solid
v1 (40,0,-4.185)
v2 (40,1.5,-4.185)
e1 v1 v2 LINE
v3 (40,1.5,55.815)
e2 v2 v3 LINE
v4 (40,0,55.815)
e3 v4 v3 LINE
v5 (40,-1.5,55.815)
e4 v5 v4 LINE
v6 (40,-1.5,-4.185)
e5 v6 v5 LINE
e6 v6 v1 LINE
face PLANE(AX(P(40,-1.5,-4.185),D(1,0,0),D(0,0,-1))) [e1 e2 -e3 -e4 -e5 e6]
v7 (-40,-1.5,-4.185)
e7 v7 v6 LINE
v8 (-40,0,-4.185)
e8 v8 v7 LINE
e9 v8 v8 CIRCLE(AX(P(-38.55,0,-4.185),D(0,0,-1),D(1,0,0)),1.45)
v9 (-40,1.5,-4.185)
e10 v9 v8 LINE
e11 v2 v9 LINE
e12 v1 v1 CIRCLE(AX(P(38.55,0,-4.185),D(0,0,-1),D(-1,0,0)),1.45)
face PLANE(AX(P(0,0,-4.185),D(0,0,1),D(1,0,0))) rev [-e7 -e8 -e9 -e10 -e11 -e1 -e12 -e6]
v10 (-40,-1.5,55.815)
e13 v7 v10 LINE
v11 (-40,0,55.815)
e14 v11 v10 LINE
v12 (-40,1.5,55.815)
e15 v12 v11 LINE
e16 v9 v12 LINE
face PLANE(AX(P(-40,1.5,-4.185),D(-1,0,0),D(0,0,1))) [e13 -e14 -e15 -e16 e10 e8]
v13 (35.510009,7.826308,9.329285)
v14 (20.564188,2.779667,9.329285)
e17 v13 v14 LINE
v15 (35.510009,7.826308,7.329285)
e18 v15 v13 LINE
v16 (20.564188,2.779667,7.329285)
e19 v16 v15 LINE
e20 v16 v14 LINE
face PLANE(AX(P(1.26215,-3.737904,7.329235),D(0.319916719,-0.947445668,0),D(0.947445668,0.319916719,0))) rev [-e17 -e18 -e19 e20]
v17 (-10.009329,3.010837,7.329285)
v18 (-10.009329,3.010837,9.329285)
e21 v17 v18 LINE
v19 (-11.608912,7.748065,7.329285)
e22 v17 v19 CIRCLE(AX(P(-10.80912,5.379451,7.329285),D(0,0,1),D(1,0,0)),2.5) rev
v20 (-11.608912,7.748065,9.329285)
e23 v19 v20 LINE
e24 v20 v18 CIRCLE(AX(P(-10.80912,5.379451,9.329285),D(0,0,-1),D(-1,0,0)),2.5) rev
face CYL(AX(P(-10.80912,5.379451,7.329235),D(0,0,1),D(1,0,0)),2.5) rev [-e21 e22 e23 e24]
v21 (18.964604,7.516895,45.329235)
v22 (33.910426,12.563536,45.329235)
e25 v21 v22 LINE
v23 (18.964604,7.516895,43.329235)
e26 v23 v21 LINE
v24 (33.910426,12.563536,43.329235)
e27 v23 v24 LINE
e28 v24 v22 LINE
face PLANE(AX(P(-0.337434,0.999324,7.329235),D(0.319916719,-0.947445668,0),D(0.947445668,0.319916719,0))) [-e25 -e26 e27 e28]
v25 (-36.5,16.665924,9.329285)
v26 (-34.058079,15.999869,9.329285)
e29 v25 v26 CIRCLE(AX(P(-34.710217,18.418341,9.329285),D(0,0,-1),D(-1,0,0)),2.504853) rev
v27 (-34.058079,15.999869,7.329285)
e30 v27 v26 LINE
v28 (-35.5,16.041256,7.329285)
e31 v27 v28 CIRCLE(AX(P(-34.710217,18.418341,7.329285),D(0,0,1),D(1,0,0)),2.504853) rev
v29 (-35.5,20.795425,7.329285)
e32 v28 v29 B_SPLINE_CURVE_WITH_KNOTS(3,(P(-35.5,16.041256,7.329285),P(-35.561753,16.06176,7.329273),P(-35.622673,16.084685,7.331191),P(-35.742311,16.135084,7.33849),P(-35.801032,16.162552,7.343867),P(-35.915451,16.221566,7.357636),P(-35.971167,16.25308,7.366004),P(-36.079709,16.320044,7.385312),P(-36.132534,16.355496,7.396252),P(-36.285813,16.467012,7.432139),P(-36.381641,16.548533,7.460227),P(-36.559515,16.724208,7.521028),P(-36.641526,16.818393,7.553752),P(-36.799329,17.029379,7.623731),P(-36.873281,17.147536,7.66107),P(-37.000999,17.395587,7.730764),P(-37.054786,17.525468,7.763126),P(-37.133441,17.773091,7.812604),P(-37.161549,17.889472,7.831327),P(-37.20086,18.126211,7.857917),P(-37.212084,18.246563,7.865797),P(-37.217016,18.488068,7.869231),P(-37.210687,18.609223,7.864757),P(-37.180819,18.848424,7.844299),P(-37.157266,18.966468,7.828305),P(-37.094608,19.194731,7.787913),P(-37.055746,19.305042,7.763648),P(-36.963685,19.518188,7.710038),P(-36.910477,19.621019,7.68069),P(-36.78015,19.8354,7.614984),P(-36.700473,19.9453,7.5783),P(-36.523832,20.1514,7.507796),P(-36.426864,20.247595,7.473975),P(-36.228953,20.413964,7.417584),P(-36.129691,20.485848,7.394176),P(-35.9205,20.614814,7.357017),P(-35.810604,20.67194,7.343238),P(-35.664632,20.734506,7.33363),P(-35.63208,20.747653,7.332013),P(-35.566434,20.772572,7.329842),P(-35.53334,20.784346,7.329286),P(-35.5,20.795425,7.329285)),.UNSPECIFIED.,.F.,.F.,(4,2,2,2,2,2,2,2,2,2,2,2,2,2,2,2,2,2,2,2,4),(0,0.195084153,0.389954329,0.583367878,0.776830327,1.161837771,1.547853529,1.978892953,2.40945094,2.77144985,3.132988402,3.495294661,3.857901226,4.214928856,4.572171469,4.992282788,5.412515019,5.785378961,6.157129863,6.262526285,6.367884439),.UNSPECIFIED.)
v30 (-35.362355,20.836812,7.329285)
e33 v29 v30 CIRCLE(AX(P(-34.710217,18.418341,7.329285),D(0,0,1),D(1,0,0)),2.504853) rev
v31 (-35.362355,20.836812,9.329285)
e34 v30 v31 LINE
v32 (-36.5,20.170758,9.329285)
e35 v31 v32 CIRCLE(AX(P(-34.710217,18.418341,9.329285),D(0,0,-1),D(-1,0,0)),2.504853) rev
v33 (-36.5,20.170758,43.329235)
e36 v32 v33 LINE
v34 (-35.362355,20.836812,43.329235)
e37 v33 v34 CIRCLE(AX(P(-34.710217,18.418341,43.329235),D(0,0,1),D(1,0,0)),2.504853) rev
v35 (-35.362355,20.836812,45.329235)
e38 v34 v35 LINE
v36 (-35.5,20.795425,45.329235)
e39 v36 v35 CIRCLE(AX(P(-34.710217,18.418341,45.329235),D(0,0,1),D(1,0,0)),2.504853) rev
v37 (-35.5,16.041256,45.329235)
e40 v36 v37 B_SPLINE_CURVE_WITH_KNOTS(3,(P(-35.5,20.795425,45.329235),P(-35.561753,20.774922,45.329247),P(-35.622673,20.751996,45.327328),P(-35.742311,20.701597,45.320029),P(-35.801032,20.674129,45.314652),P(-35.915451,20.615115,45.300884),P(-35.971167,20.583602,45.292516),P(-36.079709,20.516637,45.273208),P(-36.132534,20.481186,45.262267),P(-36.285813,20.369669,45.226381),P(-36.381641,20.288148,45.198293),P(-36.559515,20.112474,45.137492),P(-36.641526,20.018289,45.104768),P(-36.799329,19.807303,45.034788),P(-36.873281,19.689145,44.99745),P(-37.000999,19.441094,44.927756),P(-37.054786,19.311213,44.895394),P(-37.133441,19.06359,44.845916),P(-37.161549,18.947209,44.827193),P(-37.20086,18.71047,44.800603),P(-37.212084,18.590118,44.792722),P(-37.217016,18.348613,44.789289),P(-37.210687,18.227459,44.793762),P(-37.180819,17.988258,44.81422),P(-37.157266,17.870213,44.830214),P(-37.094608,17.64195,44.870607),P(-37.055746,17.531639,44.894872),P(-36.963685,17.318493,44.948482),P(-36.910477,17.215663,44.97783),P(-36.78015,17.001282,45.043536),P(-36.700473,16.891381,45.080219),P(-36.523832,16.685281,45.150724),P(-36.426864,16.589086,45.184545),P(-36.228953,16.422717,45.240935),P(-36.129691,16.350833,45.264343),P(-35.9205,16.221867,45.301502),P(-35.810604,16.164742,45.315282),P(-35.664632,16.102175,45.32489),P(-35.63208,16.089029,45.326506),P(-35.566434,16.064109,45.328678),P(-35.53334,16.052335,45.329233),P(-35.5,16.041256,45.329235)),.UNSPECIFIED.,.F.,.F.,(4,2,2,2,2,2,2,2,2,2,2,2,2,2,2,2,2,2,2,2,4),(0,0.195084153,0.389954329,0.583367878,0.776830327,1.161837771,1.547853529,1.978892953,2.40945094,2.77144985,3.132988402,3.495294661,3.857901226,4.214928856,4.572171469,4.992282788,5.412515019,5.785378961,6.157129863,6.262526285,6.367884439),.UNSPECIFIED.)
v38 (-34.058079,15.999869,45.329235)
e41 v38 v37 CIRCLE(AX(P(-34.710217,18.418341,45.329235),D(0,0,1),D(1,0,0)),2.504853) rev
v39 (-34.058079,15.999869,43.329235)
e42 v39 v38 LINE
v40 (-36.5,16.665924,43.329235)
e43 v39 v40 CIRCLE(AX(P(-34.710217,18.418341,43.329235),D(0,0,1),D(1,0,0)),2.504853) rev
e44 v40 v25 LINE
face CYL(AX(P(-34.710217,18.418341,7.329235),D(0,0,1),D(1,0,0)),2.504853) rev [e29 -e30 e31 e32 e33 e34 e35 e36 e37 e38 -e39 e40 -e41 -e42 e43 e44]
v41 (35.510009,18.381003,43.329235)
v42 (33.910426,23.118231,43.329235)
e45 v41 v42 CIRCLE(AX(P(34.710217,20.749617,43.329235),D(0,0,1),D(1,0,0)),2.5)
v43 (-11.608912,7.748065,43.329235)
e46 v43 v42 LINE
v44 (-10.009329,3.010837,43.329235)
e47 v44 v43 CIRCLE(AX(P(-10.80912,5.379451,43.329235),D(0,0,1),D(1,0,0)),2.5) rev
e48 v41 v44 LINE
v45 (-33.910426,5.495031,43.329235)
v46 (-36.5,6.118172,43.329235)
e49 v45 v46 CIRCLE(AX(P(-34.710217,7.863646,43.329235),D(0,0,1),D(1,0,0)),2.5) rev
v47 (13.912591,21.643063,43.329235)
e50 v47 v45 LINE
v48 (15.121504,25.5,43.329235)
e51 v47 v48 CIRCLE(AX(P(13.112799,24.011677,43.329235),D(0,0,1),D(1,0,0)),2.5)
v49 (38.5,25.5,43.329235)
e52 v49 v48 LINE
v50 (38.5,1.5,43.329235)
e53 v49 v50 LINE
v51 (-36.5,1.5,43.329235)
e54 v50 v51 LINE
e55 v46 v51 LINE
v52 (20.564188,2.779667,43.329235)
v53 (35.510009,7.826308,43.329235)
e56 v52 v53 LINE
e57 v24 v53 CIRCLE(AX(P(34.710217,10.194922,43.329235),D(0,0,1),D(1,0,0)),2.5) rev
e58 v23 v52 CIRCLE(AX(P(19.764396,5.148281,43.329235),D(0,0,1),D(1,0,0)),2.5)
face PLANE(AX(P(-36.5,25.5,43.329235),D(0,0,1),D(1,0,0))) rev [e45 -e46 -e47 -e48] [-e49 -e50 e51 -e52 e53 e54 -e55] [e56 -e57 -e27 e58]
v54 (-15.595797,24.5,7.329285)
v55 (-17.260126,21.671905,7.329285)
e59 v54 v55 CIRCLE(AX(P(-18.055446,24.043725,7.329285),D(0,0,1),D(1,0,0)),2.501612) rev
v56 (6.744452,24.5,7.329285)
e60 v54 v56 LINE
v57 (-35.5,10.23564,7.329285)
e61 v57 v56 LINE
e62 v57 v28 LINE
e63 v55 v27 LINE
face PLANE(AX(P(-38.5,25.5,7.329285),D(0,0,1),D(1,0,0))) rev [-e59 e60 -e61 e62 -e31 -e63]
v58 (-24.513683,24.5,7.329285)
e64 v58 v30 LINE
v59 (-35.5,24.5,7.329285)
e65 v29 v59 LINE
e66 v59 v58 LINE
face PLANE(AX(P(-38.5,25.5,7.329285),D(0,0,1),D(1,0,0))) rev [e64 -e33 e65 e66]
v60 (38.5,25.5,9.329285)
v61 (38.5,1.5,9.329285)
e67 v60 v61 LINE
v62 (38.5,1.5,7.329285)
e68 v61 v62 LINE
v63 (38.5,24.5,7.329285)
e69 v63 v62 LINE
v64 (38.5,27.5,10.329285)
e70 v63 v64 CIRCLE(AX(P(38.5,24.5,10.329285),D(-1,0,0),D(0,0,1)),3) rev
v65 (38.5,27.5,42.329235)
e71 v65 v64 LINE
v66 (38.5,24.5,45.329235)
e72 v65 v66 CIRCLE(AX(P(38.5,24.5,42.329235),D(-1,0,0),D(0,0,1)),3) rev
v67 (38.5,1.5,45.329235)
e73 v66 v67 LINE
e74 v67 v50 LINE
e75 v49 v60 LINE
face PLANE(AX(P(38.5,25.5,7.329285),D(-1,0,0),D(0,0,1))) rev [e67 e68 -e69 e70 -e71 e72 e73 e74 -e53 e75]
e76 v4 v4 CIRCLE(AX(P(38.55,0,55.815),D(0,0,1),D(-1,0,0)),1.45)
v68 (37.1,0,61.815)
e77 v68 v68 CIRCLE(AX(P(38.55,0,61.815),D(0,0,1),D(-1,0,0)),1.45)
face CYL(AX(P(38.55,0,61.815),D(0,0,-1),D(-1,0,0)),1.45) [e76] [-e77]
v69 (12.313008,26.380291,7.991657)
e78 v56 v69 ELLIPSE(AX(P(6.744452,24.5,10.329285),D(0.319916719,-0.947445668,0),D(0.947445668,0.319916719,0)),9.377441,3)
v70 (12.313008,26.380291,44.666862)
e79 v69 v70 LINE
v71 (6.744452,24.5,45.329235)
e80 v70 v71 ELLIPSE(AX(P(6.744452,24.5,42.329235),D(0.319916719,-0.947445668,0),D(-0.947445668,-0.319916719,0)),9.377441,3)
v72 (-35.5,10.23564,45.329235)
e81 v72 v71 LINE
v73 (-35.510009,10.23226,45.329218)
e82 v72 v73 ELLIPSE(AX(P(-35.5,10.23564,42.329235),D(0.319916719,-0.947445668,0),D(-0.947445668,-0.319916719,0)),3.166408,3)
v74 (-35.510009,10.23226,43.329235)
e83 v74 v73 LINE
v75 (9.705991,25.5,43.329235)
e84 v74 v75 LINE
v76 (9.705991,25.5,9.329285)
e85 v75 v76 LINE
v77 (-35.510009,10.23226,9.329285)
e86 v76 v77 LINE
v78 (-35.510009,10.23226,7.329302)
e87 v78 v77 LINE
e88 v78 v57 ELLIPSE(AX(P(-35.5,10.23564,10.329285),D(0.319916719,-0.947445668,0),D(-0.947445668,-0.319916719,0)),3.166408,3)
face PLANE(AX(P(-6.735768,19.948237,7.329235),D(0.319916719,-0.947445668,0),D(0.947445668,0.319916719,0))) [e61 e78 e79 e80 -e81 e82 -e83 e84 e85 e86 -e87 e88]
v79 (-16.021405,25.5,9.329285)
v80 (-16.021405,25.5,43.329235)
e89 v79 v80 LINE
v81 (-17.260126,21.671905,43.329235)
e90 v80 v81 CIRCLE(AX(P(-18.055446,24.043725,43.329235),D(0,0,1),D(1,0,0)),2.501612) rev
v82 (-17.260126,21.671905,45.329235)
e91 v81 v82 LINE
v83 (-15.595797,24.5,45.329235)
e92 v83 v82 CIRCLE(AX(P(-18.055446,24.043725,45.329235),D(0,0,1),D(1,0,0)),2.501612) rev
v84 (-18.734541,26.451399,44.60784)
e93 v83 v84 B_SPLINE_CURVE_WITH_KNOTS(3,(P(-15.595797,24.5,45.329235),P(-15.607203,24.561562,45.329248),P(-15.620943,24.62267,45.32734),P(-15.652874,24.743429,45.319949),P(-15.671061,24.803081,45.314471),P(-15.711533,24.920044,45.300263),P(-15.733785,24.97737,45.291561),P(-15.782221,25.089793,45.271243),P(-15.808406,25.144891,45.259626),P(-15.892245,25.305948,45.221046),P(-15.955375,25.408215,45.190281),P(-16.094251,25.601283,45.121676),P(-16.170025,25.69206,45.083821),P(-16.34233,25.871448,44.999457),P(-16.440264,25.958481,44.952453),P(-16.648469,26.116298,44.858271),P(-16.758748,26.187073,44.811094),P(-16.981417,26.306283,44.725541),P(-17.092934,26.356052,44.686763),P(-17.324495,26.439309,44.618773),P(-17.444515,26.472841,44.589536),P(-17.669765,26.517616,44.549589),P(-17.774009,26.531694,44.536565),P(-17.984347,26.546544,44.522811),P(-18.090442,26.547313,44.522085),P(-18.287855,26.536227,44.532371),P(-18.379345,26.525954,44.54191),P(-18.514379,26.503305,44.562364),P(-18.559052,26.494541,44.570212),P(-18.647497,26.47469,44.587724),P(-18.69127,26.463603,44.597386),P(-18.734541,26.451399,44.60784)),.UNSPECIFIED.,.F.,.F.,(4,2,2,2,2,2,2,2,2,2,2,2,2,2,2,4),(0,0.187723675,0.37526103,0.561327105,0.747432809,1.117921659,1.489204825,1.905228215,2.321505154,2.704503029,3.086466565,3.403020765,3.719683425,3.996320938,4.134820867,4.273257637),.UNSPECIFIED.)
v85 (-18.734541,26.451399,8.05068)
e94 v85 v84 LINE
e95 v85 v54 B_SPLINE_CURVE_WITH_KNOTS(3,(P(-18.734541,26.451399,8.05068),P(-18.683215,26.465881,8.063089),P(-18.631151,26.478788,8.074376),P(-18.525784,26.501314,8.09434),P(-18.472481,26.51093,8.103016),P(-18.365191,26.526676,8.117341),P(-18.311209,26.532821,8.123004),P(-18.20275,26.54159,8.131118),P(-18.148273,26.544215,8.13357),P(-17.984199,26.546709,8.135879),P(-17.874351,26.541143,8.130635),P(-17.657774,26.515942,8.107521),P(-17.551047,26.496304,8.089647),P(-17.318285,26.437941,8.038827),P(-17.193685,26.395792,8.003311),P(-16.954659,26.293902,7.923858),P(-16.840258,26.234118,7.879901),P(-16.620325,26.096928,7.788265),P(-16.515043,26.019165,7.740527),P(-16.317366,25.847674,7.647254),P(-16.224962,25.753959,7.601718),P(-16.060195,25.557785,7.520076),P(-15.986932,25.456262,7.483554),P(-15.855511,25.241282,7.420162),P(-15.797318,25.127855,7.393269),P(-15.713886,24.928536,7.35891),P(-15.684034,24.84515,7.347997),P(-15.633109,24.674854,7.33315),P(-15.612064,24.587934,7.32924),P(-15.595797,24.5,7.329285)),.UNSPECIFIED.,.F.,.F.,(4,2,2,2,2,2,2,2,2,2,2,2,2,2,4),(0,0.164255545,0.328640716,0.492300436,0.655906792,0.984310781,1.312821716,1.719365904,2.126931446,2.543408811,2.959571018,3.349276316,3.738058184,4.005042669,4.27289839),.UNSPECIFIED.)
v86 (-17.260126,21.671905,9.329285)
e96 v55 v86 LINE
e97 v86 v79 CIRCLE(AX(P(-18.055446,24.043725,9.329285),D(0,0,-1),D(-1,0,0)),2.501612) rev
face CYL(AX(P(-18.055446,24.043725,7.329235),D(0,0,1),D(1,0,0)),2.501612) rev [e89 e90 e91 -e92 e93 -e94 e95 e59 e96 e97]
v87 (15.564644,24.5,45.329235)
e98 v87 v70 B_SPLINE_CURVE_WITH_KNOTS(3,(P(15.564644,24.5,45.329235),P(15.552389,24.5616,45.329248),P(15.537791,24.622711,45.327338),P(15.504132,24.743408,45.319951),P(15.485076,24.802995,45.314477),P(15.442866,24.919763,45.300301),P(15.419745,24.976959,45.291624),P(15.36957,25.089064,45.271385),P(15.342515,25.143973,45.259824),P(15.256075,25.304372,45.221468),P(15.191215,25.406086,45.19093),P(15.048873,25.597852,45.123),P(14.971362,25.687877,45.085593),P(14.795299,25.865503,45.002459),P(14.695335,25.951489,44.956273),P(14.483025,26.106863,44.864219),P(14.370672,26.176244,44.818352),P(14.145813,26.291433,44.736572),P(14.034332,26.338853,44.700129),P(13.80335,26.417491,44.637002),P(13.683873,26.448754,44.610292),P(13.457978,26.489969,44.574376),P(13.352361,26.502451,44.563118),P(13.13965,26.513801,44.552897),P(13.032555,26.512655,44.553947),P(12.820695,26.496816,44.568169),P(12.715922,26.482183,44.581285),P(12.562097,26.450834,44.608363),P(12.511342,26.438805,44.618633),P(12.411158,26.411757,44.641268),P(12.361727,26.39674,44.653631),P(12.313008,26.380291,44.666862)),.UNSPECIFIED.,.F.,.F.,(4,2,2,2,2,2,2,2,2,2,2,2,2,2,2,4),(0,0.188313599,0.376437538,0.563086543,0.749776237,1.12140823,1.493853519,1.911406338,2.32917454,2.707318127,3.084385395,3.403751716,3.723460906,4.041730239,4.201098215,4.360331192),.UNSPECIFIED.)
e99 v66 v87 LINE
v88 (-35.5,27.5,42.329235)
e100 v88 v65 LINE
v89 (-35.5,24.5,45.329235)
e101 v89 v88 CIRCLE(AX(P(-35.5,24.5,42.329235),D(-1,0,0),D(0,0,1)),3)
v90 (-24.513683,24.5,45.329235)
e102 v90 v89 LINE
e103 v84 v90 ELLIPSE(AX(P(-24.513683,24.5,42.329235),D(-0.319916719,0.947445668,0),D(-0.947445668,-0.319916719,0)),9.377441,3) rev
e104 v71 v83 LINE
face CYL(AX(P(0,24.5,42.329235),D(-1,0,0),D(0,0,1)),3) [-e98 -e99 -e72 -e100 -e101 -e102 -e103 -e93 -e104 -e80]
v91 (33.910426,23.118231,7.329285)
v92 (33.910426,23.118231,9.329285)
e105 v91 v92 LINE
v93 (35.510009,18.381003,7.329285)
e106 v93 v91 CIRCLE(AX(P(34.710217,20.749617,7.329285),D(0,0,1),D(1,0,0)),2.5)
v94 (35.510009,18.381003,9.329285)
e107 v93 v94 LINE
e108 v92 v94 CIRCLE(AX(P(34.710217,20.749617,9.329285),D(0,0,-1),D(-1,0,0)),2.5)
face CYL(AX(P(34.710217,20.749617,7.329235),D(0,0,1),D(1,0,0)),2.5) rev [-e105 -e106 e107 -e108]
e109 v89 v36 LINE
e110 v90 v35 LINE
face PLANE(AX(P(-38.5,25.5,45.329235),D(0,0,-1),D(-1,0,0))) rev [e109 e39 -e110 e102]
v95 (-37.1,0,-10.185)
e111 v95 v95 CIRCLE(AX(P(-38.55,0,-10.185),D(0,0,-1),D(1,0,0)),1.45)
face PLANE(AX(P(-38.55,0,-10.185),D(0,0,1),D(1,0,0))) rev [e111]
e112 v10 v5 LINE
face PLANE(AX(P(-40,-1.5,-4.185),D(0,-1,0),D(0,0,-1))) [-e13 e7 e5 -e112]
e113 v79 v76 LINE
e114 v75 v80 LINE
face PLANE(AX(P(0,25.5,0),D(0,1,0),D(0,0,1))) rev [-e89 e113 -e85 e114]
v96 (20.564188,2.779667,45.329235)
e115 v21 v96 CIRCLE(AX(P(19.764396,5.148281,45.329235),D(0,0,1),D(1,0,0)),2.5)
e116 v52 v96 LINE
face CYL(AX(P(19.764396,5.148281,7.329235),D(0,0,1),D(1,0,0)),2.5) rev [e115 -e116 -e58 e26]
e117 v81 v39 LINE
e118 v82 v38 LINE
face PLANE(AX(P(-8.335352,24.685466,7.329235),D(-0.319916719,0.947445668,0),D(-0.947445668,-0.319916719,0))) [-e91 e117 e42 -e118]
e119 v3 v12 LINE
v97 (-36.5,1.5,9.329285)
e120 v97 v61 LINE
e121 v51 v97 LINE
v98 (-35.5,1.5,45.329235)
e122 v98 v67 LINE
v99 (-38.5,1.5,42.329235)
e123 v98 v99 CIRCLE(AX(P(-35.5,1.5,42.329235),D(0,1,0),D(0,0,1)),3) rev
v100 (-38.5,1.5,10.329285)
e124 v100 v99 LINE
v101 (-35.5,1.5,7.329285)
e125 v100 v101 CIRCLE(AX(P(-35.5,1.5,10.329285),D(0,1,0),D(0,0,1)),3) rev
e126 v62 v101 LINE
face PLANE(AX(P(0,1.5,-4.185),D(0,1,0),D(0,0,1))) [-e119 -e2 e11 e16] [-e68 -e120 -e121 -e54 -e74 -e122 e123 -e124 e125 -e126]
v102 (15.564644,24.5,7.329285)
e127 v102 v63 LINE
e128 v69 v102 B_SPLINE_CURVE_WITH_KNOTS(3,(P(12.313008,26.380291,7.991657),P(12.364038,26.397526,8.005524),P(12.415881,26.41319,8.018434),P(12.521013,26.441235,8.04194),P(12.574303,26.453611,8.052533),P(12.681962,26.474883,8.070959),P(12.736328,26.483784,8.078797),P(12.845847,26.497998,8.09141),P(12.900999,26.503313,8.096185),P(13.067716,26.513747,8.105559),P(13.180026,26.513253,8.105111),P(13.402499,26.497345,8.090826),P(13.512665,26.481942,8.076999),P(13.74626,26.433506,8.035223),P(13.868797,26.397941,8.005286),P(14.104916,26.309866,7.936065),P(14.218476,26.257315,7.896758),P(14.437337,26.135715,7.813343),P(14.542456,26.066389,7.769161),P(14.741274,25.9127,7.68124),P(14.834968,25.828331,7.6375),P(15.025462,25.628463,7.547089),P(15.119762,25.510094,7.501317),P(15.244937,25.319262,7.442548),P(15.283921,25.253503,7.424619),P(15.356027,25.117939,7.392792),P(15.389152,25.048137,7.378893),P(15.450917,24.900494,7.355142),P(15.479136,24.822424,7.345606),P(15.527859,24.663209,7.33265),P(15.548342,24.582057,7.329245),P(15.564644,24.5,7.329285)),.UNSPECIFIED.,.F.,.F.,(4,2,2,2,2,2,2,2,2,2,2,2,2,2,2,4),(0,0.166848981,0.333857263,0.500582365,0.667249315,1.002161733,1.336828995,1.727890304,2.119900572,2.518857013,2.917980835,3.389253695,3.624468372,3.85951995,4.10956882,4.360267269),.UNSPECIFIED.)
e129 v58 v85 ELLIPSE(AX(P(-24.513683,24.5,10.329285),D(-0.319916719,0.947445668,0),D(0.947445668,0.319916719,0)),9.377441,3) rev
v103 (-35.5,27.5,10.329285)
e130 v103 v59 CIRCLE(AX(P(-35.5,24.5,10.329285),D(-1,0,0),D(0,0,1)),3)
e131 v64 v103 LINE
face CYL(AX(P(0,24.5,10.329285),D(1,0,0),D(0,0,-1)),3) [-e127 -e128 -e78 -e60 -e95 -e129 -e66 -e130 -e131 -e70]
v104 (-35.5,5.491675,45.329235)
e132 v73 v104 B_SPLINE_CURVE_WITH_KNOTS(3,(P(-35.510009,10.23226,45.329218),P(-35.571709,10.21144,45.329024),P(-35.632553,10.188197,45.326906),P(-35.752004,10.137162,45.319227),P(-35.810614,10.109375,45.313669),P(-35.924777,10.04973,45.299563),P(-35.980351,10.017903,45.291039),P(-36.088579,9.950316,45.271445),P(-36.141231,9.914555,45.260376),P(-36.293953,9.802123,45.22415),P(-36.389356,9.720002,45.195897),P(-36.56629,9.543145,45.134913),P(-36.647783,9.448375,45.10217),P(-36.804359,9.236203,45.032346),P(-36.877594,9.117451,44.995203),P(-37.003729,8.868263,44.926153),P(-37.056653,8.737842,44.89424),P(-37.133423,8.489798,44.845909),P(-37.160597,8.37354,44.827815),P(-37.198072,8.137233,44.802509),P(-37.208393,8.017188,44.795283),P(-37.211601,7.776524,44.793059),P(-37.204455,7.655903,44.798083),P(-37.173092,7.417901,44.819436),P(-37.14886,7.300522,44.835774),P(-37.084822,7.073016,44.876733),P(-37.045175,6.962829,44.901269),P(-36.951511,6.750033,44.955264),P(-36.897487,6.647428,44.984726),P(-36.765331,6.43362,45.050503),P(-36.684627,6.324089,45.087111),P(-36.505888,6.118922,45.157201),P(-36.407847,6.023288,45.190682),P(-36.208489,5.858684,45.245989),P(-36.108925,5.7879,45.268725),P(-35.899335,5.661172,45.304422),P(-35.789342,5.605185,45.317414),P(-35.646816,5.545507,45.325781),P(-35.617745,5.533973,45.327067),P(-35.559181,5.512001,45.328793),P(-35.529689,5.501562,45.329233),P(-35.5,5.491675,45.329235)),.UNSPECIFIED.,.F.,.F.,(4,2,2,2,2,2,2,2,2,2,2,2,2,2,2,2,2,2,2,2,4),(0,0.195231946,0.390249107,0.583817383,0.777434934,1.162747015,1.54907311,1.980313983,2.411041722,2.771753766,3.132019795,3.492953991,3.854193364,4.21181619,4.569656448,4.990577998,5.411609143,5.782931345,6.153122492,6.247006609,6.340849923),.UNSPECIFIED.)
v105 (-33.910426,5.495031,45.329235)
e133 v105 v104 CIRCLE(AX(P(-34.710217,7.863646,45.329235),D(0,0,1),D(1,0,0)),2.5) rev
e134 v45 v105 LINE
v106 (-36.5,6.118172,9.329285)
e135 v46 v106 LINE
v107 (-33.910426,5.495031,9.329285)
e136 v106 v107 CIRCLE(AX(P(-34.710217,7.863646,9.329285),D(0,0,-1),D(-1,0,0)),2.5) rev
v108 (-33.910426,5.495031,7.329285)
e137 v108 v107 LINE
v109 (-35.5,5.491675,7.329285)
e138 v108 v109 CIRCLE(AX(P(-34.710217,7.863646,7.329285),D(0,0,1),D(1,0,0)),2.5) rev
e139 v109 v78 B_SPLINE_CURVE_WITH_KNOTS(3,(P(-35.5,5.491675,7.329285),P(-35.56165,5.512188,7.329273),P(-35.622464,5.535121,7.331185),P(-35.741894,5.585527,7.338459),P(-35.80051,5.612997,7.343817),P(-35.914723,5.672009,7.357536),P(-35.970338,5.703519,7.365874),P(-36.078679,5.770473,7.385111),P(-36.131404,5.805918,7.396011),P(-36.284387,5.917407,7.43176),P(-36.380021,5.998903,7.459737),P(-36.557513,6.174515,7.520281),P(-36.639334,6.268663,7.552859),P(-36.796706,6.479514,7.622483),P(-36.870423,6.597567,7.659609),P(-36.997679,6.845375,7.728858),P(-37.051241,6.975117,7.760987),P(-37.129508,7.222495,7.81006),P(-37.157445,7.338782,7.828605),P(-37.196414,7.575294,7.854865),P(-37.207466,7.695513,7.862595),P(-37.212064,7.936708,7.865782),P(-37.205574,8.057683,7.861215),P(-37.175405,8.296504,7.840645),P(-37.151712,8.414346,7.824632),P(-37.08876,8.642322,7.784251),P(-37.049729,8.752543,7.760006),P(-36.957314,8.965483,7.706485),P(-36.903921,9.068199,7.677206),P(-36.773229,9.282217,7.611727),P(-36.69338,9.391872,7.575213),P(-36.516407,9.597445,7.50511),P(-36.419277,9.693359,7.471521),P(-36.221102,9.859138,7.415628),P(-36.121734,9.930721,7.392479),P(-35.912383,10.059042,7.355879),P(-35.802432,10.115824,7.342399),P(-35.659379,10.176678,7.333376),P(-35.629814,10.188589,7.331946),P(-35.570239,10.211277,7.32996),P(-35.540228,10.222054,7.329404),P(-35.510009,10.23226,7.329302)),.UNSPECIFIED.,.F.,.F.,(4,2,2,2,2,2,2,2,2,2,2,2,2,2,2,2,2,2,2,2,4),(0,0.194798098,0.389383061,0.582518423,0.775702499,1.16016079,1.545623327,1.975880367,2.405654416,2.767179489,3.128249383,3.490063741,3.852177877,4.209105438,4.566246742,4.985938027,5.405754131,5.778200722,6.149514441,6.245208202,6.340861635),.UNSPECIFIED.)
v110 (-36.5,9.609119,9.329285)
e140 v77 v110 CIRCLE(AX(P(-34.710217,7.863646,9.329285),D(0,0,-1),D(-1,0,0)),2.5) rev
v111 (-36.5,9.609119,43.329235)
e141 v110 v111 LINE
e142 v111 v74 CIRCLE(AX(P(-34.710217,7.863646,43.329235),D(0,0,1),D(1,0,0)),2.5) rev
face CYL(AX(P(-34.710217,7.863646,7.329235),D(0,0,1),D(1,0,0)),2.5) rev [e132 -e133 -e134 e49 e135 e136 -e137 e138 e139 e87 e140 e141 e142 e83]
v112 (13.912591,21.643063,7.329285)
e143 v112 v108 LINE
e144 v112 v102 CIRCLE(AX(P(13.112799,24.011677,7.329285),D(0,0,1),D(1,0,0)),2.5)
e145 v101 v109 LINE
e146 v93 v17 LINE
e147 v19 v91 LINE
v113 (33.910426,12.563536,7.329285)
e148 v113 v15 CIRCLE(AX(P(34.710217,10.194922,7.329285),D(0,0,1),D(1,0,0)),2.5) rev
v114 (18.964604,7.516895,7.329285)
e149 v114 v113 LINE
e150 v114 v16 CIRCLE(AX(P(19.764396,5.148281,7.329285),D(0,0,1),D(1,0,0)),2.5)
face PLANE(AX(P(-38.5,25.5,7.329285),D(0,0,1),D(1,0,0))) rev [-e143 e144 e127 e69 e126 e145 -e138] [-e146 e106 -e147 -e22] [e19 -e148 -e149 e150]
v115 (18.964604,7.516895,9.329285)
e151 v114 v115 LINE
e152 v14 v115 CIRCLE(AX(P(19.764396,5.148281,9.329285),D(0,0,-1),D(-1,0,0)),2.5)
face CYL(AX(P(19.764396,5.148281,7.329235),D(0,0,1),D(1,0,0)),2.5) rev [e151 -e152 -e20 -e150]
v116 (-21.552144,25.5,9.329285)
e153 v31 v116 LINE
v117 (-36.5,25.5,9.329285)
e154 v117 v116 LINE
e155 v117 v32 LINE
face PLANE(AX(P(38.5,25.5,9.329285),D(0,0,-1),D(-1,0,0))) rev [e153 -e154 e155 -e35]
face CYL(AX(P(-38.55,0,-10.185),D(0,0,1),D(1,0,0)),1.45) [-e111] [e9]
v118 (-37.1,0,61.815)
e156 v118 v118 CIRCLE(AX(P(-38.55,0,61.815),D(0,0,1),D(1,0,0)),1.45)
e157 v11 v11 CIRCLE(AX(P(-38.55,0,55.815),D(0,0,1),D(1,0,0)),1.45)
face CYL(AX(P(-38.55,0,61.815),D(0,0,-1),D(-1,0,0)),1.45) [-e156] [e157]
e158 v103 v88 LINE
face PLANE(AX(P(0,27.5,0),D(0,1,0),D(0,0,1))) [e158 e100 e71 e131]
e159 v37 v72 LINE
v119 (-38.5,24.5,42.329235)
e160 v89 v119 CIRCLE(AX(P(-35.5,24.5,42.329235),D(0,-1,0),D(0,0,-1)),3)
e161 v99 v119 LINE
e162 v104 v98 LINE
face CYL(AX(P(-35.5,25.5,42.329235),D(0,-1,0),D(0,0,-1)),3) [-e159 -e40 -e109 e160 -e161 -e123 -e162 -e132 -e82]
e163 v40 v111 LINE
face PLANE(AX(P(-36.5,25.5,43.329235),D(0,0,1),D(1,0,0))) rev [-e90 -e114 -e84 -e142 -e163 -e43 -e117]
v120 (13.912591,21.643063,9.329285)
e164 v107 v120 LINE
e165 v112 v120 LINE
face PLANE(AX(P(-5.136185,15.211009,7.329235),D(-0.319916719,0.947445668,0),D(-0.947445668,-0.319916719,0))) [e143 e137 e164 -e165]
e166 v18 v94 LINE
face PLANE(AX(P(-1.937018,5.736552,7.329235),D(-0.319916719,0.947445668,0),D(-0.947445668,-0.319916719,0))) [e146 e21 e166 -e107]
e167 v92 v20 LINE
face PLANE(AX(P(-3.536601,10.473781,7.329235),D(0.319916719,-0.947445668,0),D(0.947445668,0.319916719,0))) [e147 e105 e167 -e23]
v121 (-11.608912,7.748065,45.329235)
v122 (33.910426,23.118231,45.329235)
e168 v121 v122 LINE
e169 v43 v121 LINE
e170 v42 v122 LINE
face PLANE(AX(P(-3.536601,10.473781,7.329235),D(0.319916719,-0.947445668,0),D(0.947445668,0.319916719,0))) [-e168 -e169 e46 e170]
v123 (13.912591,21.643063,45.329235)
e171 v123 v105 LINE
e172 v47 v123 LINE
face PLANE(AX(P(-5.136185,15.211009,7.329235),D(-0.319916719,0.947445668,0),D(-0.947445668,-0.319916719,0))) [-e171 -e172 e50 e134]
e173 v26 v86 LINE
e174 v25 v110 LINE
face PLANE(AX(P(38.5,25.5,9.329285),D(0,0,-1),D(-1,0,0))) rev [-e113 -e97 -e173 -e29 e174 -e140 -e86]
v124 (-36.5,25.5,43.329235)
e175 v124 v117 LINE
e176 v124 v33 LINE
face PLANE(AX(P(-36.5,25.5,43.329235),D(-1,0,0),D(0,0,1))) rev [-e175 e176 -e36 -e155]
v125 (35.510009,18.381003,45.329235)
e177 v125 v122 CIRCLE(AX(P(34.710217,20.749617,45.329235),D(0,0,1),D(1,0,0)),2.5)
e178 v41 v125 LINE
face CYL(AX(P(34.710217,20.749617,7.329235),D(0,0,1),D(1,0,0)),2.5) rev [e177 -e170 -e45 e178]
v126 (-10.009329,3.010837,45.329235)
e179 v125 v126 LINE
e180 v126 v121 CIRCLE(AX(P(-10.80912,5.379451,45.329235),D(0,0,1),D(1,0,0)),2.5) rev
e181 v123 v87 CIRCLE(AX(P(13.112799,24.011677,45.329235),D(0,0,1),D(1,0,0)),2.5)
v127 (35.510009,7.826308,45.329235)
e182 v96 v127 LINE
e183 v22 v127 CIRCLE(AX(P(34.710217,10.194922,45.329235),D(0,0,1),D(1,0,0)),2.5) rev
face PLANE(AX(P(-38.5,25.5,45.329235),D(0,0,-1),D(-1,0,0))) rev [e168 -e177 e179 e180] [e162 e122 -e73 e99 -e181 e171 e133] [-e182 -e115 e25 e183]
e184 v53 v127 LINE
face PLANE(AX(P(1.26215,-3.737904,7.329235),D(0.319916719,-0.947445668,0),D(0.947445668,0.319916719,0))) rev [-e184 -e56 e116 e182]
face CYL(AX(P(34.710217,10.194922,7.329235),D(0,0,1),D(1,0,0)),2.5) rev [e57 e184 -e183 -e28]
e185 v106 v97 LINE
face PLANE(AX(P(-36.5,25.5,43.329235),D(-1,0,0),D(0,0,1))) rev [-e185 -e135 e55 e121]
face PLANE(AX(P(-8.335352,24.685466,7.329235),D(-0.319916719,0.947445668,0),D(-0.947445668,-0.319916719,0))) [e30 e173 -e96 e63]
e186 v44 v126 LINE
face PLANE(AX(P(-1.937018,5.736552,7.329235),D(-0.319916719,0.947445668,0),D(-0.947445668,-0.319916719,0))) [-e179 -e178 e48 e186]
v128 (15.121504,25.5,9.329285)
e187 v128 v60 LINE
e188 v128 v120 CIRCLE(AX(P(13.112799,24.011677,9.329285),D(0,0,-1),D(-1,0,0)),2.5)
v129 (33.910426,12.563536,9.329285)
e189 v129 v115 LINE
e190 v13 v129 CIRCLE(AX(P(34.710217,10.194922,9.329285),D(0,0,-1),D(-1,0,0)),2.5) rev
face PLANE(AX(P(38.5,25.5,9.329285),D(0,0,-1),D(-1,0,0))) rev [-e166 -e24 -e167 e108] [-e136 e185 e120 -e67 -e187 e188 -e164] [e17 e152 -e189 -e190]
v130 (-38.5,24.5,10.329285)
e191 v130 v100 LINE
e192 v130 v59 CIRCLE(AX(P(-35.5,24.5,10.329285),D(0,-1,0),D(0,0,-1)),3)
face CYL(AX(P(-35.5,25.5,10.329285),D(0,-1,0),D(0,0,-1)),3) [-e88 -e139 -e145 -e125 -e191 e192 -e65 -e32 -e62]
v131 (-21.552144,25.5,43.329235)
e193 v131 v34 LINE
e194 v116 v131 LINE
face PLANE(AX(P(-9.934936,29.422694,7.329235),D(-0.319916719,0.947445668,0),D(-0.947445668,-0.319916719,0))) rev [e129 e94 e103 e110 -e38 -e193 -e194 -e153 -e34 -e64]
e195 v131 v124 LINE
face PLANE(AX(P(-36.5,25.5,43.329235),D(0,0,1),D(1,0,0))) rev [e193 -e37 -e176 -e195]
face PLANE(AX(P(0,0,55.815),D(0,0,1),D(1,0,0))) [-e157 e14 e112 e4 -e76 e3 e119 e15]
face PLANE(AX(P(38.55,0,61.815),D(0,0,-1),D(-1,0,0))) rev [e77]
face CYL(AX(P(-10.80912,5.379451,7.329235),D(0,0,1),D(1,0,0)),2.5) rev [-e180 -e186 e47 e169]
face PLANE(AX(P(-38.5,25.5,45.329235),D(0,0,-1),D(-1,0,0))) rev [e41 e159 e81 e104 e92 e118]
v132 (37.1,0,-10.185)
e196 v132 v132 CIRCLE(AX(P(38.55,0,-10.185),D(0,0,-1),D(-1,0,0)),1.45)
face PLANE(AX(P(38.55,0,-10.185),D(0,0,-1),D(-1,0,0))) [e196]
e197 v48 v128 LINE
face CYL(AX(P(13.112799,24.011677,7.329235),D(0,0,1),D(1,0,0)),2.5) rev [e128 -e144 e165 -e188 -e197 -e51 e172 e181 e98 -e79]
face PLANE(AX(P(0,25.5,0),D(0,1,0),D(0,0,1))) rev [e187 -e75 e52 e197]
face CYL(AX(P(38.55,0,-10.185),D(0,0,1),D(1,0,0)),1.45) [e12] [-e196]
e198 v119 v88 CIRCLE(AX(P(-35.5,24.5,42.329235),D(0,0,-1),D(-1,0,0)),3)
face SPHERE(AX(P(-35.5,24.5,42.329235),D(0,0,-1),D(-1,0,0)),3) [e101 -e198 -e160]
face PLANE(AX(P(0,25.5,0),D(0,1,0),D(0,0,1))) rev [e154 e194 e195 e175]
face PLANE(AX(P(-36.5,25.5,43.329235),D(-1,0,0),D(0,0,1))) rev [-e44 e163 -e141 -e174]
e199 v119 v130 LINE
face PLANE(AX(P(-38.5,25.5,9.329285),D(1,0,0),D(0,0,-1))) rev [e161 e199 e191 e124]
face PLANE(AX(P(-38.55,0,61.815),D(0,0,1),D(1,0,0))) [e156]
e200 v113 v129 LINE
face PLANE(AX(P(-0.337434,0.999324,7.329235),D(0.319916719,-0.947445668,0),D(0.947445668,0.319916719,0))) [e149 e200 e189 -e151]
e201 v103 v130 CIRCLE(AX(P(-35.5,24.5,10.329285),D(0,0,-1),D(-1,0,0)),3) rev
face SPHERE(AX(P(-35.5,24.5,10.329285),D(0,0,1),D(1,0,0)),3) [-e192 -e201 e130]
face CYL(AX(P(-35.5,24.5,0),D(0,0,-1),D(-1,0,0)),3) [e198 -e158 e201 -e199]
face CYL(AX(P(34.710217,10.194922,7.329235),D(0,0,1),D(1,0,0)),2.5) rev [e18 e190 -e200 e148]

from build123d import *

# Parameters (mm, degrees)
EXTRUDE_1_DEPTH      = 55.815
EXTRUDE_1_DEPTH_BACK = 4.185
EXTRUDE_4_DEPTH      = 24
SKETCH_13_R          = 1.45
EXTRUDE_5_DEPTH      = 6
EXTRUDE_START        = 6
SKETCH_14_R          = 1.45
EXTRUDE_6_DEPTH      = 6
SKETCH_15_W          = 77
SKETCH_15_H          = 37.999949308
EXTRUDE_7_DEPTH      = 2
CUT_EXTRUDE_2_DEPTH  = 38
FILLET_2_R           = 3
FILLET_3_R           = 3
FILLET_4_R           = 3


with BuildPart() as part:
    # 草图1 → 凸台-拉伸1 (new, two sides: drawn at the far end of the back side and taken through both)
    with BuildSketch(Plane.XY.offset(-EXTRUDE_1_DEPTH_BACK)):
        Polygon((0, 1.5), (30, 1.5), (40, 1.5), (40, -1.5), (-40, -1.5), (-40, 1.5), align=None)
    extrude(amount=EXTRUDE_1_DEPTH + EXTRUDE_1_DEPTH_BACK)

    # 草图11 → 凸台-拉伸4 (add)
    with BuildSketch(Plane(origin=(0, 1.5, 0), x_dir=(1, 0, 0), z_dir=(0, 1, 0))):
        Polygon((36.5, -9.329285225), (-36.5, -9.329285225), (-36.5, -43.329234533), (36.5, -43.329234533), (38.5, -43.329234533), (38.5, -45.329234533), (-38.5, -45.329234533), (-38.5, -9.329285225), (-38.5, -7.329285225), (36.5, -7.329285225), (38.5, -7.329285225), (38.5, -9.329285225), align=None)
    extrude(amount=EXTRUDE_4_DEPTH)

    # 草图13 → 凸台-拉伸5 (add)
    with BuildSketch(Plane.XY.offset(55.815)):
        with Locations(Location((-38.55, 0, 0), (0, 0, 180))):
            Circle(SKETCH_13_R)
        with Locations(Location((38.55, 0, 0), (0, 0, 180))):
            Circle(SKETCH_13_R)
    extrude(amount=EXTRUDE_5_DEPTH)

    # 草图14 → 凸台-拉伸6 (add)
    with BuildSketch(Plane(origin=(0, 0, -4.185), x_dir=(-1, 0, 0), z_dir=(0, 0, -1)).offset(EXTRUDE_START)):
        with Locations((-38.55, 0)):
            Circle(SKETCH_14_R)
        with Locations((38.55, 0)):
            Circle(SKETCH_14_R)
    extrude(amount=-EXTRUDE_6_DEPTH)

    # 草图15 → 凸台-拉伸7 (add)
    with BuildSketch(Plane(origin=(0, 25.5, 0), x_dir=(1, 0, 0), z_dir=(0, 1, 0))):
        with Locations((0, -26.329259879)):
            Rectangle(SKETCH_15_W, SKETCH_15_H)
    extrude(amount=EXTRUDE_7_DEPTH)

    # 草图16 → 切除-拉伸2 (cut)
    with BuildSketch(Plane.XY.offset(45.329234533)):
        with BuildLine():
            Line((-18.734540656, 26.451398681), (-35.362355257, 20.836811932))
            ThreePointArc((-35.362355257, 20.836811932), (-37.12868865, 17.766202685), (-34.058079403, 15.999869293))
            Line((-34.058079403, 15.999869293), (-17.260126249, 21.671905422))
            ThreePointArc((-17.260126249, 21.671905422), (-15.664993145, 24.781150117), (-18.734540656, 26.451398681))
        make_face()
        with BuildLine():
            Line((-35.510009127, 10.232259834), (12.313007681, 26.380291484))
            ThreePointArc((12.313007681, 26.380291484), (15.481413648, 24.811469112), (13.912591276, 21.643063146))
            Line((13.912591276, 21.643063146), (-33.910425533, 5.495031496))
            ThreePointArc((-33.910425533, 5.495031496), (-37.078831499, 7.063853868), (-35.510009127, 10.232259834))
        make_face()
        with BuildLine():
            Line((-11.608912214, 7.748065143), (33.910425533, 23.118231136))
            ThreePointArc((33.910425533, 23.118231136), (37.078831499, 21.549408764), (35.510009127, 18.381002798))
            Line((35.510009127, 18.381002798), (-10.009328619, 3.010836806))
            ThreePointArc((-10.009328619, 3.010836806), (-13.177734585, 4.579659177), (-11.608912214, 7.748065143))
        make_face()
        with BuildLine():
            Line((18.964604183, 7.516895213), (33.910425533, 12.563536189))
            ThreePointArc((33.910425533, 12.563536189), (37.078831499, 10.994713817), (35.510009127, 7.826307851))
            Line((35.510009127, 7.826307851), (20.564187778, 2.779666876))
            ThreePointArc((20.564187778, 2.779666876), (17.395781811, 4.348489247), (18.964604183, 7.516895213))
        make_face()
    extrude(amount=-CUT_EXTRUDE_2_DEPTH, mode=Mode.SUBTRACT)

    # 圆角2
    fillet_2_edges = [part.edges().sort_by_distance(p)[0] for p in [
        (-38.5, 27.5, 26.329259879),
    ]]
    fillet(fillet_2_edges, radius=FILLET_2_R)

    # 圆角3
    # the kernel refuses this fillet: 3 mm, written as the material it takes off along each edge
    with BuildSketch(Plane(origin=(-38.5, 1.5, 7.329285225), x_dir=(1, 0, 0), z_dir=(0, 1, 0))) as fillet_3_piece_1:
        with BuildLine():
            CenterArc((FILLET_3_R, -FILLET_3_R), FILLET_3_R, 90, 90)
            Line((0, -FILLET_3_R), (0, 0))
            Line((0, 0), (FILLET_3_R, 0))
        make_face()
    extrude(amount=23, mode=Mode.SUBTRACT)
    with BuildSketch(Plane(origin=(-35.5, 24.5, 7.329285225), x_dir=(-1, 0, 0), z_dir=(0, -1, 0))) as fillet_3_piece_2:
        with BuildLine():
            CenterArc((3 - FILLET_3_R, -FILLET_3_R), FILLET_3_R, 0, 90)
            Line((3, -FILLET_3_R), (3, 0))
            Line((3, 0), (3 - FILLET_3_R, 0))
        make_face()
    revolve(axis=Axis((-35.5, 24.5, 7.329285225), (0, 0, -1)), revolution_arc=90, mode=Mode.SUBTRACT)
    with BuildSketch(Plane(origin=(46, 27.5, 7.329285225), x_dir=(0, -1, 0), z_dir=(-1, 0, 0))) as fillet_3_piece_3:
        with BuildLine():
            CenterArc((FILLET_3_R, FILLET_3_R), FILLET_3_R, 180, 90)
            Line((0, FILLET_3_R), (0, 0))
            Line((0, 0), (FILLET_3_R, 0))
        make_face()
    extrude(amount=81.5, mode=Mode.SUBTRACT)

    # 圆角4
    # the kernel refuses this fillet: 3 mm, written as the material it takes off along each edge
    with BuildSketch(Plane(origin=(-35.5, 27.5, 45.329234533), x_dir=(0, -1, 0), z_dir=(1, 0, 0))) as fillet_4_piece_1:
        with BuildLine():
            CenterArc((FILLET_4_R, FILLET_4_R), FILLET_4_R, 180, 90)
            Line((0, FILLET_4_R), (0, 0))
            Line((0, 0), (FILLET_4_R, 0))
        make_face()
    extrude(amount=81.5, mode=Mode.SUBTRACT)
    with BuildSketch(Plane(origin=(-38.5, 1.5, 45.329234533), x_dir=(1, 0, 0), z_dir=(0, 1, 0))) as fillet_4_piece_2:
        with BuildLine():
            CenterArc((FILLET_4_R, FILLET_4_R), FILLET_4_R, 180, 90)
            Line((0, FILLET_4_R), (0, 0))
            Line((0, 0), (FILLET_4_R, 0))
        make_face()
    extrude(amount=23, mode=Mode.SUBTRACT)
    with BuildSketch(Plane(origin=(-35.5, 24.5, 45.329234533), x_dir=(-1, 0, 0), z_dir=(0, -1, 0))) as fillet_4_piece_3:
        with BuildLine():
            CenterArc((3 - FILLET_4_R, FILLET_4_R), FILLET_4_R, 270, 90)
            Line((3, FILLET_4_R), (3, 0))
            Line((3, 0), (3 - FILLET_4_R, 0))
        make_face()
    revolve(axis=Axis((-35.5, 24.5, 45.329234533), (0, 0, -1)), revolution_arc=90, mode=Mode.SUBTRACT)


solid = part.part
